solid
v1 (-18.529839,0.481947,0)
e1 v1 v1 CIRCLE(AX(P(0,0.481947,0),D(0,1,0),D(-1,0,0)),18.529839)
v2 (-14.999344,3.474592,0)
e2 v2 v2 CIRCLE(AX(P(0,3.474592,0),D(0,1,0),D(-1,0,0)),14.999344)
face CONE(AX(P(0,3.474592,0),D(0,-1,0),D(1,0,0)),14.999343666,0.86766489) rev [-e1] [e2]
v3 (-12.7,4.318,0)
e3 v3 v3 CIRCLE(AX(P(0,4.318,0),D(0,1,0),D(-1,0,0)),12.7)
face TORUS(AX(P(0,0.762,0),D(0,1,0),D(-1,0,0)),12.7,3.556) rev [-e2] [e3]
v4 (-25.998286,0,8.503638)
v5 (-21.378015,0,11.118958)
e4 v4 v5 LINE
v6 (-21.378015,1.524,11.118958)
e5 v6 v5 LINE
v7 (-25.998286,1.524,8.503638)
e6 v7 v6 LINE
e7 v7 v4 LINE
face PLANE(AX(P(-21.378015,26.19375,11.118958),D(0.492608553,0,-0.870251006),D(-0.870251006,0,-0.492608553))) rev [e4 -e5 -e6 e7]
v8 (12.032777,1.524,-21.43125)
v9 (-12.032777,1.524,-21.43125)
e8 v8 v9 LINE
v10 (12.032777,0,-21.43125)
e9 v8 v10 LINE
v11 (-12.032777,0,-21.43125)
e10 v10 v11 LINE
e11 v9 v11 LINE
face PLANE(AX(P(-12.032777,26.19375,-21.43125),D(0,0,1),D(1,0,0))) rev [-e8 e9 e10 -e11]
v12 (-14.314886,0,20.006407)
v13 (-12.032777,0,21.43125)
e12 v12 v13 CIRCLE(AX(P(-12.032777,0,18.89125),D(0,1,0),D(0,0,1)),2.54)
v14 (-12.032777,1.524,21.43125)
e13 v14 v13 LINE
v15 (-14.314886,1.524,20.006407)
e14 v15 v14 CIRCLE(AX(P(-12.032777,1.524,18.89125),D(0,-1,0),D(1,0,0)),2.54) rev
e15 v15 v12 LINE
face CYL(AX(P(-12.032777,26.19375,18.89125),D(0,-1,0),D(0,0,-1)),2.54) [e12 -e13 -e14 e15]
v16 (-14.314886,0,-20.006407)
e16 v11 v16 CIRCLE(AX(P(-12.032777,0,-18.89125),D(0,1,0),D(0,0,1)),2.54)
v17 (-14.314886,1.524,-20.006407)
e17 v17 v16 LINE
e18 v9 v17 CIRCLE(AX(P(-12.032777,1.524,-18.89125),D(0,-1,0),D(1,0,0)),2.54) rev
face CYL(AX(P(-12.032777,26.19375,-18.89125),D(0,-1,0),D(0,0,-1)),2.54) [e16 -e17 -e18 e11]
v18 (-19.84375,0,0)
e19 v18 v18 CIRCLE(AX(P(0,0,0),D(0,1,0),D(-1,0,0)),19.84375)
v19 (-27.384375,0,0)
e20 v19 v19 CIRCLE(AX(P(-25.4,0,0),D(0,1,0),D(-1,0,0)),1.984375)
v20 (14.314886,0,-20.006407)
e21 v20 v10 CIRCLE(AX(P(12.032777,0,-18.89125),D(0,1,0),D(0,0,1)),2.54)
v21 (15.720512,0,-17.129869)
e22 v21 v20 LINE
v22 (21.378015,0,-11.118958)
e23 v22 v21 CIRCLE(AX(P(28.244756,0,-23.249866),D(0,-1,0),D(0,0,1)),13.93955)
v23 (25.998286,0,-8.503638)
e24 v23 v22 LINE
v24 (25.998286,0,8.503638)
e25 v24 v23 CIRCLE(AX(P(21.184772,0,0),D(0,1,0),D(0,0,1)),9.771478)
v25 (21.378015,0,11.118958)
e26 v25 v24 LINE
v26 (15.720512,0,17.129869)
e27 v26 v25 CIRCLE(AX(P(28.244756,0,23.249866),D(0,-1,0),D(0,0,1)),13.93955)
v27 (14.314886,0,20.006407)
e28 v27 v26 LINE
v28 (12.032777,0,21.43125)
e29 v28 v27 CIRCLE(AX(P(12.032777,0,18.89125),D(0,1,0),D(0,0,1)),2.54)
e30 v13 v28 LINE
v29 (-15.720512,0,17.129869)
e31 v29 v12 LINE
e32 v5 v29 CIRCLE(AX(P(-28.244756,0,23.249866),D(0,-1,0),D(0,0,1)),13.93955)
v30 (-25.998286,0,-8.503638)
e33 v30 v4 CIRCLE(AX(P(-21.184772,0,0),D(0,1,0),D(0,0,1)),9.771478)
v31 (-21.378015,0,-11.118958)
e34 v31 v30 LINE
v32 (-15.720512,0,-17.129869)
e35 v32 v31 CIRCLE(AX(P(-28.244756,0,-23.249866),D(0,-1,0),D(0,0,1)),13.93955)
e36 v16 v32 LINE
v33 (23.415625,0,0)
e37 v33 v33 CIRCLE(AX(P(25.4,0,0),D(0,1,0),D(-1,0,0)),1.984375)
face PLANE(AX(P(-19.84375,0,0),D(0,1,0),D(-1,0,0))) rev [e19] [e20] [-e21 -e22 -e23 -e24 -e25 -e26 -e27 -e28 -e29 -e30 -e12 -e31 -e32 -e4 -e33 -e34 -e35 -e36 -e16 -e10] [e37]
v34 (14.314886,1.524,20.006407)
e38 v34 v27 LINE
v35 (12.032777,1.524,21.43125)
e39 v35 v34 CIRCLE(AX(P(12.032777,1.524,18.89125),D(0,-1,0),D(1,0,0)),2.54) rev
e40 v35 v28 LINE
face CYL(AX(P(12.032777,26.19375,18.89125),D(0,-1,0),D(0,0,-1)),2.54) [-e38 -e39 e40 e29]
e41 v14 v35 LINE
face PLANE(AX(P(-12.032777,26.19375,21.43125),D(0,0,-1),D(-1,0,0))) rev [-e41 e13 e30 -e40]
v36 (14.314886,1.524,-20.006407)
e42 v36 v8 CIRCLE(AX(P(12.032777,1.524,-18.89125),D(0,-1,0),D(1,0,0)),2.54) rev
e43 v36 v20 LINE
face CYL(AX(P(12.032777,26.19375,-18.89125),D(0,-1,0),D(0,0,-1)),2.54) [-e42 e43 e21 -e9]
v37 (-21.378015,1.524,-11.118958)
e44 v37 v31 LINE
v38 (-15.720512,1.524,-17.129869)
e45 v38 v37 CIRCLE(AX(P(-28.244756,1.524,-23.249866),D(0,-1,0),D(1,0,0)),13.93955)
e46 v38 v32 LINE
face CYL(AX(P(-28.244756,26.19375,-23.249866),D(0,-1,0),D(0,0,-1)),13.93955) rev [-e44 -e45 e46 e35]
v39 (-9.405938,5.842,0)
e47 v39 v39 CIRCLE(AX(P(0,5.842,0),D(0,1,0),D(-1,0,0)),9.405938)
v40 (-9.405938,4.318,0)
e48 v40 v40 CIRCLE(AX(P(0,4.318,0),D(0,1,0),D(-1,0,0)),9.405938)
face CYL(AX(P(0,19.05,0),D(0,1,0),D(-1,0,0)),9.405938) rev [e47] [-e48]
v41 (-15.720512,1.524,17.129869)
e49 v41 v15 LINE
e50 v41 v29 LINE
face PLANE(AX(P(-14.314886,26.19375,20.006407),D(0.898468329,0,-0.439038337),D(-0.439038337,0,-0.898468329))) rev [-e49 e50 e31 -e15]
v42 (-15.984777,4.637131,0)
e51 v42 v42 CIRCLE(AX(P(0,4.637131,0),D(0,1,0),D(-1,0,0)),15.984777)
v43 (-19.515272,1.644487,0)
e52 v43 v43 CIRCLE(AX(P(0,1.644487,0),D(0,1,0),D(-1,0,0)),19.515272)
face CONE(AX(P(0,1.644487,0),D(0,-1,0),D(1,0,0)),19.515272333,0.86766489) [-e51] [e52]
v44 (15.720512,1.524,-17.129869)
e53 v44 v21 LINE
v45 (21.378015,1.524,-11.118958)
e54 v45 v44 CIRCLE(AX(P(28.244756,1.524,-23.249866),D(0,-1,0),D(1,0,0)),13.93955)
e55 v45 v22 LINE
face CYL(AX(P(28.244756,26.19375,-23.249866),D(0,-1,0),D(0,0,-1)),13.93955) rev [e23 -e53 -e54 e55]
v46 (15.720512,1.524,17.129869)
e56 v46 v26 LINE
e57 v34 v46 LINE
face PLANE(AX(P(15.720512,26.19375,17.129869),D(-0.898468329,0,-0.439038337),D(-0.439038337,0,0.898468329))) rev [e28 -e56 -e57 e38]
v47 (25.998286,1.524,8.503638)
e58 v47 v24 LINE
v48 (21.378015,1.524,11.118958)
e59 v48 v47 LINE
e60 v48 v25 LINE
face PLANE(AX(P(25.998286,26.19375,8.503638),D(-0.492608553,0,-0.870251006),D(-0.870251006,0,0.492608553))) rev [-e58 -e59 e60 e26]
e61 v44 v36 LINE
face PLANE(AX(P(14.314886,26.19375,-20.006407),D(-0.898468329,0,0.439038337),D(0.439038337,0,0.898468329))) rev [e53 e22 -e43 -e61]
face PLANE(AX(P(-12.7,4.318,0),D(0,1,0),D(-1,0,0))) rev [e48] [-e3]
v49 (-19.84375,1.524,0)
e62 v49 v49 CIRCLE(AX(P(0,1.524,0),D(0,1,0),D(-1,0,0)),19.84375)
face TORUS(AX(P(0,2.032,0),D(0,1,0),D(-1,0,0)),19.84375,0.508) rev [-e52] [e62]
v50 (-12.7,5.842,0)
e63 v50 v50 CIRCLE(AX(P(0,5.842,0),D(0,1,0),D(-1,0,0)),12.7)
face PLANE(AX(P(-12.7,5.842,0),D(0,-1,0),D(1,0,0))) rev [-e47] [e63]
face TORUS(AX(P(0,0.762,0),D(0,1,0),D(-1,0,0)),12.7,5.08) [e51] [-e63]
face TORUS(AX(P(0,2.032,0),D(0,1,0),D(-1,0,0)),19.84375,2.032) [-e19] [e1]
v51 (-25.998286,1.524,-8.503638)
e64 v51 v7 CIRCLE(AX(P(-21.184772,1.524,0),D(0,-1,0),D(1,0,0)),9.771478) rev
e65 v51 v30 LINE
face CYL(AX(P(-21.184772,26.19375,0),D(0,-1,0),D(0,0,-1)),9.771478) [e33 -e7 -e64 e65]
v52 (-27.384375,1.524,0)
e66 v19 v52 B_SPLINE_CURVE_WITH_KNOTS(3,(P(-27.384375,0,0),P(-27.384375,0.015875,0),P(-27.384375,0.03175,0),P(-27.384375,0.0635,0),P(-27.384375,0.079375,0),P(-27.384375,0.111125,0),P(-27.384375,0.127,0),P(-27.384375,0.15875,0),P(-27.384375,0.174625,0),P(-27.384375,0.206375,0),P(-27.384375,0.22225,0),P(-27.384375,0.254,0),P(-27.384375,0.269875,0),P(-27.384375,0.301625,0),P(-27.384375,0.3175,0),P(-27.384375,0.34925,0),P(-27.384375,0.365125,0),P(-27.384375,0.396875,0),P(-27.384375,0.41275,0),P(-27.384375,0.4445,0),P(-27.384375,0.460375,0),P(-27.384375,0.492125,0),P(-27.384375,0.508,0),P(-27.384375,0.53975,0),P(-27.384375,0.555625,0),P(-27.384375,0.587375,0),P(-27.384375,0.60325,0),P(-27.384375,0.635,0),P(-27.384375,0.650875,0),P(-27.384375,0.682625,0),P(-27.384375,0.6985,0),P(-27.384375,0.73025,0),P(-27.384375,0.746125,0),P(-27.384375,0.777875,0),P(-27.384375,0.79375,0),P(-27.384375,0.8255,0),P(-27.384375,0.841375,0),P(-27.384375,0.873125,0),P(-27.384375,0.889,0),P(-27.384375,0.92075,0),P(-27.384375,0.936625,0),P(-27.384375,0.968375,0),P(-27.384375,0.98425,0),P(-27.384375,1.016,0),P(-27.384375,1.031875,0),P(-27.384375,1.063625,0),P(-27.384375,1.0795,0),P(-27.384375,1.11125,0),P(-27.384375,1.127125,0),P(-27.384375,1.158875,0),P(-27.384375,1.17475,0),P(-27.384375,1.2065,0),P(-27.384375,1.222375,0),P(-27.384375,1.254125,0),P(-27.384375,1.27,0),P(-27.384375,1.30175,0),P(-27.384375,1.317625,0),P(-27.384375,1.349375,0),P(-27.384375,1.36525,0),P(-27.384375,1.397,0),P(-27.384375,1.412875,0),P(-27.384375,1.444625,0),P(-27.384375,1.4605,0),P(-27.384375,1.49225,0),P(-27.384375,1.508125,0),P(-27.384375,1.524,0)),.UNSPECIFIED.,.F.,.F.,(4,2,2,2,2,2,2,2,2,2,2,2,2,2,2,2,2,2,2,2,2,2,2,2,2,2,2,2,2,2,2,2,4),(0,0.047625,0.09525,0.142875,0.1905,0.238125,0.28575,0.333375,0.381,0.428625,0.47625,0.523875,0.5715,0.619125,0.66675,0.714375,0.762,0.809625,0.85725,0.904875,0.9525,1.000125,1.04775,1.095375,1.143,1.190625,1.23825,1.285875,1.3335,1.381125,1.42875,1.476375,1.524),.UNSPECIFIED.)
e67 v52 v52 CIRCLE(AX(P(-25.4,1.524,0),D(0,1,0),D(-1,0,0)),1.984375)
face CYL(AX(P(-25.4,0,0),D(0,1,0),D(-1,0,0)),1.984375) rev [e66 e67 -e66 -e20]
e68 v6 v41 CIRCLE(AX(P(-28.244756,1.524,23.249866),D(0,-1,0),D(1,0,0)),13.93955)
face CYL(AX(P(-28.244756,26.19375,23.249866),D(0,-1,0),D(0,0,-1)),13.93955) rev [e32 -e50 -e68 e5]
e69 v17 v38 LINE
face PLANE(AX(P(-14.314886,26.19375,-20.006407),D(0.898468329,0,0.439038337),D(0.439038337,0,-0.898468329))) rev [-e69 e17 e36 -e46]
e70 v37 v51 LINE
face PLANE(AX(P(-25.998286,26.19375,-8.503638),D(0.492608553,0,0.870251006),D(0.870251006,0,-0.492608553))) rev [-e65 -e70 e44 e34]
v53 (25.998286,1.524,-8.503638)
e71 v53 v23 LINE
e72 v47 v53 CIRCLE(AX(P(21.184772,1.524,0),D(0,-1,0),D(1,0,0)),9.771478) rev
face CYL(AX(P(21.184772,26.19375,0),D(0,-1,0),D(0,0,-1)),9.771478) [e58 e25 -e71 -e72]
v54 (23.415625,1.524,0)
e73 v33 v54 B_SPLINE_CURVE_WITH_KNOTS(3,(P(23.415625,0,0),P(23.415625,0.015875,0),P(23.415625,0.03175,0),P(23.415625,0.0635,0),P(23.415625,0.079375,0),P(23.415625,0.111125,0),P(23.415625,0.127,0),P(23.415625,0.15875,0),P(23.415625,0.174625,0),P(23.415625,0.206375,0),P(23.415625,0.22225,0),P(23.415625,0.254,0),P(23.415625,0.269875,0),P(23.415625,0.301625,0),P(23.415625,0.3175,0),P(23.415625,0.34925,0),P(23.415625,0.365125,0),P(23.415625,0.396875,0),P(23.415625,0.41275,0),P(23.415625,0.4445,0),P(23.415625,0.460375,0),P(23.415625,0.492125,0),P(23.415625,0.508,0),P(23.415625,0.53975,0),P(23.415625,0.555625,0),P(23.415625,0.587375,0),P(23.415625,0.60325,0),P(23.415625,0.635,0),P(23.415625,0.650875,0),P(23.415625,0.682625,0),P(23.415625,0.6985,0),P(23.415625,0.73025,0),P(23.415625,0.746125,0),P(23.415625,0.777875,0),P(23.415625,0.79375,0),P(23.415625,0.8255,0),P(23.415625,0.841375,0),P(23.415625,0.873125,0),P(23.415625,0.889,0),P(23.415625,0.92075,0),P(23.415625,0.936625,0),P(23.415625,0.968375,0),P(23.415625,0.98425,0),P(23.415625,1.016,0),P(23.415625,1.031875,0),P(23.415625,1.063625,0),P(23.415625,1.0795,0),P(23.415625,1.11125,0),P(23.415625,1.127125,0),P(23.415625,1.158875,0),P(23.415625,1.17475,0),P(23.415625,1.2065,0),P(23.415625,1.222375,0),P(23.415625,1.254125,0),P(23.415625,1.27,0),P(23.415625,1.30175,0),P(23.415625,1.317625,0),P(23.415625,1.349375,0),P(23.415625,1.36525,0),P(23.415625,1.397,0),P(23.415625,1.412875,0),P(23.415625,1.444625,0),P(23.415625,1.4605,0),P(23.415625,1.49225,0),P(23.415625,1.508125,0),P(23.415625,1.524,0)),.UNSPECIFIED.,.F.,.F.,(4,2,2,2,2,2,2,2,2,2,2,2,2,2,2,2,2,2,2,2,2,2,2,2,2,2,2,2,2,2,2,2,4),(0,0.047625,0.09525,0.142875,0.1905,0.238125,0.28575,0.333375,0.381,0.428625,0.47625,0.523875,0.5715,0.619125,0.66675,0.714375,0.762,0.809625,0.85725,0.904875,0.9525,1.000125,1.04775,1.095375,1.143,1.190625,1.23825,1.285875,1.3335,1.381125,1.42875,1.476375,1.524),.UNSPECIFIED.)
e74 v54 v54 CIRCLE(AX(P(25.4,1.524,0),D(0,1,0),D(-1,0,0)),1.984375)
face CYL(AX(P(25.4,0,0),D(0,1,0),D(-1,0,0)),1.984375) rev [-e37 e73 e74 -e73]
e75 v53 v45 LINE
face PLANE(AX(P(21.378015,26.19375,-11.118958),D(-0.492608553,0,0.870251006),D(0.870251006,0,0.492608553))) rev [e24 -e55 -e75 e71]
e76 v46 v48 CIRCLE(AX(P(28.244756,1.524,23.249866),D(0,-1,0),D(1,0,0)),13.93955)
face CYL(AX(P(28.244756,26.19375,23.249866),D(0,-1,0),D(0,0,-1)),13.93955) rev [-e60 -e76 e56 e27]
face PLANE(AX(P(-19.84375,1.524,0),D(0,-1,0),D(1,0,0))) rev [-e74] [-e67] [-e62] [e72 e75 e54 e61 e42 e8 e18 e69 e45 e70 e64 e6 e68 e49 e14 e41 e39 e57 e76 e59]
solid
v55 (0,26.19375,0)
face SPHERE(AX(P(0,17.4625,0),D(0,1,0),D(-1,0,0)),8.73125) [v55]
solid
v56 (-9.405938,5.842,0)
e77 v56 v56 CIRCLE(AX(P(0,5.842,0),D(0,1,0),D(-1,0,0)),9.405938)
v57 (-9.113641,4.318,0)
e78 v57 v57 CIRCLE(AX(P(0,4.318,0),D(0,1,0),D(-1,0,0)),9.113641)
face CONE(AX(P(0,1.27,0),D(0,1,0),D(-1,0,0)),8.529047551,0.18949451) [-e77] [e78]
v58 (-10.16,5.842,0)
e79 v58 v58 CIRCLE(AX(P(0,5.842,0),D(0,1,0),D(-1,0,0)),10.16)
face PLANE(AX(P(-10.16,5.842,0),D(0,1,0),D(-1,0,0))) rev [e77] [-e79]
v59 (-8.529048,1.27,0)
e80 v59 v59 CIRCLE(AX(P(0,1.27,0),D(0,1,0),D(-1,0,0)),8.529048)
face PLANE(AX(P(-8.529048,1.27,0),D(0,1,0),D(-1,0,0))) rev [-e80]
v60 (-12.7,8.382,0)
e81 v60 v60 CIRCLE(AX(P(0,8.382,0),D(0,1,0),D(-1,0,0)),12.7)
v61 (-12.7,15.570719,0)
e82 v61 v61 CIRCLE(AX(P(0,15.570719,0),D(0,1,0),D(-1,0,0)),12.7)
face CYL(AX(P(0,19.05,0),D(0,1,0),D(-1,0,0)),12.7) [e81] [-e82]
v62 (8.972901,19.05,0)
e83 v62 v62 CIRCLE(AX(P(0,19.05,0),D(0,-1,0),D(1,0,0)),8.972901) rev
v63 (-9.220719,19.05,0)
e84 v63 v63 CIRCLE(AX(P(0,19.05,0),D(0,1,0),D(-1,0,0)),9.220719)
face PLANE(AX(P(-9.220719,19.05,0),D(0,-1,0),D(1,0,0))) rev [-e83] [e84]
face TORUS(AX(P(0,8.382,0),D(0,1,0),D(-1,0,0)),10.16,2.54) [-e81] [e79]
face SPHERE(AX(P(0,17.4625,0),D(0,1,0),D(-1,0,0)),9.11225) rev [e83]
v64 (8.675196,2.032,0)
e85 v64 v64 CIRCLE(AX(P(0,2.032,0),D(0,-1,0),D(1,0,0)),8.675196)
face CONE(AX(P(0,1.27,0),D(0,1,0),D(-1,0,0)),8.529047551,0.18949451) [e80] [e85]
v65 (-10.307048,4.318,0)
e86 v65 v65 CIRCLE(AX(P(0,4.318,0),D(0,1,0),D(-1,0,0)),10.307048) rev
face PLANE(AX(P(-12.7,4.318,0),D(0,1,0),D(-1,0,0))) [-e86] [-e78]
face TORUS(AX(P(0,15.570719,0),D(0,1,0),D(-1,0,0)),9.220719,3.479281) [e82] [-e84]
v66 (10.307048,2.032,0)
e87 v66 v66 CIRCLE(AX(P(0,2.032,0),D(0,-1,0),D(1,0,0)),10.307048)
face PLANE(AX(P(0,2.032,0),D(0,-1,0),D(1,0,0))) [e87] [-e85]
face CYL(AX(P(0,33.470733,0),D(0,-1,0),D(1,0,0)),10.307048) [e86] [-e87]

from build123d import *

# Parameters (mm, degrees)
SKETCH9_OUTSIDE_W   = 82.19
SKETCH9_OUTSIDE_H   = 82.19
CUT_EXTRUDE3_DEPTH  = 52.016579336
SKETCH8_R           = 1.984375
CUT_EXTRUDE1_DEPTH  = 46.013158695
BOSS_EXTRUDE2_START = -0.762
SKETCH7_R           = 10.307047551
BOSS_EXTRUDE2_DEPTH = 2.286


# Read off the part's stored shape, not the designer's step: Move Face1
with BuildPart() as part:
    # Sketch4 → Revolve3 (revolve)
    with BuildSketch(Plane.XY, mode=Mode.PRIVATE) as revolve3_sk:
        with BuildLine():
            Line((19.515272333, 1.644486874), (15.984776665, 4.637131257))
            ThreePointArc((15.984776665, 4.637131257), (14.449390353, 5.531280176), (12.7, 5.842))
            Line((12.7, 5.842), (9.4059375, 5.842))
            Line((9.4059375, 5.842), (9.4059375, 4.318))
            Line((9.4059375, 4.318), (12.7, 4.318))
            ThreePointArc((12.7, 4.318), (13.924573247, 4.100496123), (14.999343666, 3.47459188))
            Line((14.999343666, 3.47459188), (18.529839334, 0.481947497))
            ThreePointArc((18.529839334, 0.481947497), (19.143993859, 0.12428793), (19.84375, 0))
            Line((19.84375, 0), (30.95625, 0))
            Line((30.95625, 0), (30.95625, 1.524))
            Line((30.95625, 1.524), (19.84375, 1.524))
            ThreePointArc((19.84375, 1.524), (19.668810965, 1.555071982), (19.515272333, 1.644486874))
        make_face()
    revolve(revolve3_sk.sketch.rotate(Axis((0, 19.05, 0), (0, -1, 0)), 180), axis=Axis((0, 19.05, 0), (0, -1, 0)))

    # Sketch9 outside → Cut-Extrude3 (cut, through all)
    with BuildSketch(Plane(origin=(0, 0, 0), x_dir=(1, 0, 0), z_dir=(0, 1, 0))):
        Rectangle(SKETCH9_OUTSIDE_W, SKETCH9_OUTSIDE_H)
        with BuildLine():
            Line((-14.314886108, 20.006407376), (-15.720512319, 17.129868982))
            ThreePointArc((-15.720512319, 17.129868982), (-18.094123839, 13.696033599), (-21.378014937, 11.118958448))
            Line((-21.378014937, 11.118958448), (-25.998285744, 8.503638382))
            ThreePointArc((-25.998285744, 8.503638382), (-30.95625, 0), (-25.998285744, -8.503638382))
            Line((-25.998285744, -8.503638382), (-21.378014937, -11.118958448))
            ThreePointArc((-21.378014937, -11.118958448), (-18.094123839, -13.696033599), (-15.720512319, -17.129868982))
            Line((-15.720512319, -17.129868982), (-14.314886108, -20.006407376))
            ThreePointArc((-14.314886108, -20.006407376), (-13.377971754, -21.045791684), (-12.032776552, -21.43125))
            Line((-12.032776552, -21.43125), (12.032776552, -21.43125))
            ThreePointArc((12.032776552, -21.43125), (13.377971754, -21.045791684), (14.314886108, -20.006407376))
            Line((14.314886108, -20.006407376), (15.720512319, -17.129868982))
            ThreePointArc((15.720512319, -17.129868982), (18.094123839, -13.696033599), (21.378014937, -11.118958448))
            Line((21.378014937, -11.118958448), (25.998285744, -8.503638382))
            ThreePointArc((25.998285744, -8.503638382), (30.95625, 0), (25.998285744, 8.503638382))
            Line((25.998285744, 8.503638382), (21.378014937, 11.118958448))
            ThreePointArc((21.378014937, 11.118958448), (18.094123839, 13.696033599), (15.720512319, 17.129868982))
            Line((15.720512319, 17.129868982), (14.314886108, 20.006407376))
            ThreePointArc((14.314886108, 20.006407376), (13.377971754, 21.045791684), (12.032776552, 21.43125))
            Line((12.032776552, 21.43125), (-12.032776552, 21.43125))
            ThreePointArc((-12.032776552, 21.43125), (-13.377971754, 21.045791684), (-14.314886108, 20.006407376))
        make_face(mode=Mode.SUBTRACT)
    extrude(amount=CUT_EXTRUDE3_DEPTH, mode=Mode.SUBTRACT)

    # Sketch8 → Cut-Extrude1 (cut, through all)
    with BuildSketch(Plane(origin=(0, 1.524, 0), x_dir=(1, 0, 0), z_dir=(0, 1, 0))):
        with Locations(Location((-25.4, 0, 0), (0, 0, 180))):
            Circle(SKETCH8_R)
        with Locations(Location((25.4, 0, 0), (0, 0, 180))):
            Circle(SKETCH8_R)
    extrude(amount=-CUT_EXTRUDE1_DEPTH, mode=Mode.SUBTRACT)


with BuildPart() as body_2:
    # Sketch1 → Revolve1 (revolve)
    with BuildSketch(Plane.XY, mode=Mode.PRIVATE) as revolve1_sk:
        with BuildLine():
            Line((9.220718975, 19.05), (0, 19.05))
            Line((0, 19.05), (0, 1.27))
            Line((0, 1.27), (8.529047551, 1.27))
            Line((8.529047551, 1.27), (9.4059375, 5.842))
            Line((9.4059375, 5.842), (10.16, 5.842))
            ThreePointArc((10.16, 5.842), (11.956051224, 6.585948776), (12.7, 8.382))
            Line((12.7, 8.382), (12.7, 15.570718975))
            ThreePointArc((12.7, 15.570718975), (11.680942181, 18.030942181), (9.220718975, 19.05))
        make_face()
    revolve(revolve1_sk.sketch.rotate(Axis((0, 19.05, 0), (0, -1, 0)), 180), axis=Axis((0, 19.05, 0), (0, -1, 0)))

    # Sketch3<2> → Cut-Revolve1 (revolve, cut)
    with BuildSketch(Plane.XY):
        with BuildLine():
            Line((0, 26.19375), (0, 8.73125))
            ThreePointArc((0, 8.73125), (8.73125, 17.4625), (0, 26.19375))
        make_face()
    revolve(axis=Axis((0, 26.19375, 0), (0, -1, 0)), mode=Mode.SUBTRACT)

    # Move Face1 outline → Move Face1 (revolve, cut)
    with BuildSketch(Plane.XY):
        with BuildLine():
            Line((0, 8.73125), (0, 8.35025))
            ThreePointArc((0, 8.35025), (6.982076948, 11.607271435), (8.972900522, 19.050000009))
            Line((8.972900522, 19.050000009), (8.585718973, 19.050000009))
            ThreePointArc((8.585718973, 19.050000009), (6.711765268, 11.877973739), (0, 8.73125))
        make_face()
    revolve(axis=Axis((0, 0, 0), (0, 1, 0)), mode=Mode.SUBTRACT)

    # Sketch7 → Boss-Extrude2 (add)
    with BuildSketch(Plane.XZ.offset(-1.27).offset(BOSS_EXTRUDE2_START)):
        Circle(SKETCH7_R)
    extrude(amount=-BOSS_EXTRUDE2_DEPTH)


with BuildPart() as body_3:
    # Sketch3 → Revolve2 (revolve)
    with BuildSketch(Plane.XY):
        with BuildLine():
            Line((0, 26.19375), (0, 8.73125))
            ThreePointArc((0, 8.73125), (8.73125, 17.4625), (0, 26.19375))
        make_face()
    revolve(axis=Axis((0, 26.19375, 0), (0, -1, 0)))


solid = Compound([part.part, body_2.part, body_3.part])
